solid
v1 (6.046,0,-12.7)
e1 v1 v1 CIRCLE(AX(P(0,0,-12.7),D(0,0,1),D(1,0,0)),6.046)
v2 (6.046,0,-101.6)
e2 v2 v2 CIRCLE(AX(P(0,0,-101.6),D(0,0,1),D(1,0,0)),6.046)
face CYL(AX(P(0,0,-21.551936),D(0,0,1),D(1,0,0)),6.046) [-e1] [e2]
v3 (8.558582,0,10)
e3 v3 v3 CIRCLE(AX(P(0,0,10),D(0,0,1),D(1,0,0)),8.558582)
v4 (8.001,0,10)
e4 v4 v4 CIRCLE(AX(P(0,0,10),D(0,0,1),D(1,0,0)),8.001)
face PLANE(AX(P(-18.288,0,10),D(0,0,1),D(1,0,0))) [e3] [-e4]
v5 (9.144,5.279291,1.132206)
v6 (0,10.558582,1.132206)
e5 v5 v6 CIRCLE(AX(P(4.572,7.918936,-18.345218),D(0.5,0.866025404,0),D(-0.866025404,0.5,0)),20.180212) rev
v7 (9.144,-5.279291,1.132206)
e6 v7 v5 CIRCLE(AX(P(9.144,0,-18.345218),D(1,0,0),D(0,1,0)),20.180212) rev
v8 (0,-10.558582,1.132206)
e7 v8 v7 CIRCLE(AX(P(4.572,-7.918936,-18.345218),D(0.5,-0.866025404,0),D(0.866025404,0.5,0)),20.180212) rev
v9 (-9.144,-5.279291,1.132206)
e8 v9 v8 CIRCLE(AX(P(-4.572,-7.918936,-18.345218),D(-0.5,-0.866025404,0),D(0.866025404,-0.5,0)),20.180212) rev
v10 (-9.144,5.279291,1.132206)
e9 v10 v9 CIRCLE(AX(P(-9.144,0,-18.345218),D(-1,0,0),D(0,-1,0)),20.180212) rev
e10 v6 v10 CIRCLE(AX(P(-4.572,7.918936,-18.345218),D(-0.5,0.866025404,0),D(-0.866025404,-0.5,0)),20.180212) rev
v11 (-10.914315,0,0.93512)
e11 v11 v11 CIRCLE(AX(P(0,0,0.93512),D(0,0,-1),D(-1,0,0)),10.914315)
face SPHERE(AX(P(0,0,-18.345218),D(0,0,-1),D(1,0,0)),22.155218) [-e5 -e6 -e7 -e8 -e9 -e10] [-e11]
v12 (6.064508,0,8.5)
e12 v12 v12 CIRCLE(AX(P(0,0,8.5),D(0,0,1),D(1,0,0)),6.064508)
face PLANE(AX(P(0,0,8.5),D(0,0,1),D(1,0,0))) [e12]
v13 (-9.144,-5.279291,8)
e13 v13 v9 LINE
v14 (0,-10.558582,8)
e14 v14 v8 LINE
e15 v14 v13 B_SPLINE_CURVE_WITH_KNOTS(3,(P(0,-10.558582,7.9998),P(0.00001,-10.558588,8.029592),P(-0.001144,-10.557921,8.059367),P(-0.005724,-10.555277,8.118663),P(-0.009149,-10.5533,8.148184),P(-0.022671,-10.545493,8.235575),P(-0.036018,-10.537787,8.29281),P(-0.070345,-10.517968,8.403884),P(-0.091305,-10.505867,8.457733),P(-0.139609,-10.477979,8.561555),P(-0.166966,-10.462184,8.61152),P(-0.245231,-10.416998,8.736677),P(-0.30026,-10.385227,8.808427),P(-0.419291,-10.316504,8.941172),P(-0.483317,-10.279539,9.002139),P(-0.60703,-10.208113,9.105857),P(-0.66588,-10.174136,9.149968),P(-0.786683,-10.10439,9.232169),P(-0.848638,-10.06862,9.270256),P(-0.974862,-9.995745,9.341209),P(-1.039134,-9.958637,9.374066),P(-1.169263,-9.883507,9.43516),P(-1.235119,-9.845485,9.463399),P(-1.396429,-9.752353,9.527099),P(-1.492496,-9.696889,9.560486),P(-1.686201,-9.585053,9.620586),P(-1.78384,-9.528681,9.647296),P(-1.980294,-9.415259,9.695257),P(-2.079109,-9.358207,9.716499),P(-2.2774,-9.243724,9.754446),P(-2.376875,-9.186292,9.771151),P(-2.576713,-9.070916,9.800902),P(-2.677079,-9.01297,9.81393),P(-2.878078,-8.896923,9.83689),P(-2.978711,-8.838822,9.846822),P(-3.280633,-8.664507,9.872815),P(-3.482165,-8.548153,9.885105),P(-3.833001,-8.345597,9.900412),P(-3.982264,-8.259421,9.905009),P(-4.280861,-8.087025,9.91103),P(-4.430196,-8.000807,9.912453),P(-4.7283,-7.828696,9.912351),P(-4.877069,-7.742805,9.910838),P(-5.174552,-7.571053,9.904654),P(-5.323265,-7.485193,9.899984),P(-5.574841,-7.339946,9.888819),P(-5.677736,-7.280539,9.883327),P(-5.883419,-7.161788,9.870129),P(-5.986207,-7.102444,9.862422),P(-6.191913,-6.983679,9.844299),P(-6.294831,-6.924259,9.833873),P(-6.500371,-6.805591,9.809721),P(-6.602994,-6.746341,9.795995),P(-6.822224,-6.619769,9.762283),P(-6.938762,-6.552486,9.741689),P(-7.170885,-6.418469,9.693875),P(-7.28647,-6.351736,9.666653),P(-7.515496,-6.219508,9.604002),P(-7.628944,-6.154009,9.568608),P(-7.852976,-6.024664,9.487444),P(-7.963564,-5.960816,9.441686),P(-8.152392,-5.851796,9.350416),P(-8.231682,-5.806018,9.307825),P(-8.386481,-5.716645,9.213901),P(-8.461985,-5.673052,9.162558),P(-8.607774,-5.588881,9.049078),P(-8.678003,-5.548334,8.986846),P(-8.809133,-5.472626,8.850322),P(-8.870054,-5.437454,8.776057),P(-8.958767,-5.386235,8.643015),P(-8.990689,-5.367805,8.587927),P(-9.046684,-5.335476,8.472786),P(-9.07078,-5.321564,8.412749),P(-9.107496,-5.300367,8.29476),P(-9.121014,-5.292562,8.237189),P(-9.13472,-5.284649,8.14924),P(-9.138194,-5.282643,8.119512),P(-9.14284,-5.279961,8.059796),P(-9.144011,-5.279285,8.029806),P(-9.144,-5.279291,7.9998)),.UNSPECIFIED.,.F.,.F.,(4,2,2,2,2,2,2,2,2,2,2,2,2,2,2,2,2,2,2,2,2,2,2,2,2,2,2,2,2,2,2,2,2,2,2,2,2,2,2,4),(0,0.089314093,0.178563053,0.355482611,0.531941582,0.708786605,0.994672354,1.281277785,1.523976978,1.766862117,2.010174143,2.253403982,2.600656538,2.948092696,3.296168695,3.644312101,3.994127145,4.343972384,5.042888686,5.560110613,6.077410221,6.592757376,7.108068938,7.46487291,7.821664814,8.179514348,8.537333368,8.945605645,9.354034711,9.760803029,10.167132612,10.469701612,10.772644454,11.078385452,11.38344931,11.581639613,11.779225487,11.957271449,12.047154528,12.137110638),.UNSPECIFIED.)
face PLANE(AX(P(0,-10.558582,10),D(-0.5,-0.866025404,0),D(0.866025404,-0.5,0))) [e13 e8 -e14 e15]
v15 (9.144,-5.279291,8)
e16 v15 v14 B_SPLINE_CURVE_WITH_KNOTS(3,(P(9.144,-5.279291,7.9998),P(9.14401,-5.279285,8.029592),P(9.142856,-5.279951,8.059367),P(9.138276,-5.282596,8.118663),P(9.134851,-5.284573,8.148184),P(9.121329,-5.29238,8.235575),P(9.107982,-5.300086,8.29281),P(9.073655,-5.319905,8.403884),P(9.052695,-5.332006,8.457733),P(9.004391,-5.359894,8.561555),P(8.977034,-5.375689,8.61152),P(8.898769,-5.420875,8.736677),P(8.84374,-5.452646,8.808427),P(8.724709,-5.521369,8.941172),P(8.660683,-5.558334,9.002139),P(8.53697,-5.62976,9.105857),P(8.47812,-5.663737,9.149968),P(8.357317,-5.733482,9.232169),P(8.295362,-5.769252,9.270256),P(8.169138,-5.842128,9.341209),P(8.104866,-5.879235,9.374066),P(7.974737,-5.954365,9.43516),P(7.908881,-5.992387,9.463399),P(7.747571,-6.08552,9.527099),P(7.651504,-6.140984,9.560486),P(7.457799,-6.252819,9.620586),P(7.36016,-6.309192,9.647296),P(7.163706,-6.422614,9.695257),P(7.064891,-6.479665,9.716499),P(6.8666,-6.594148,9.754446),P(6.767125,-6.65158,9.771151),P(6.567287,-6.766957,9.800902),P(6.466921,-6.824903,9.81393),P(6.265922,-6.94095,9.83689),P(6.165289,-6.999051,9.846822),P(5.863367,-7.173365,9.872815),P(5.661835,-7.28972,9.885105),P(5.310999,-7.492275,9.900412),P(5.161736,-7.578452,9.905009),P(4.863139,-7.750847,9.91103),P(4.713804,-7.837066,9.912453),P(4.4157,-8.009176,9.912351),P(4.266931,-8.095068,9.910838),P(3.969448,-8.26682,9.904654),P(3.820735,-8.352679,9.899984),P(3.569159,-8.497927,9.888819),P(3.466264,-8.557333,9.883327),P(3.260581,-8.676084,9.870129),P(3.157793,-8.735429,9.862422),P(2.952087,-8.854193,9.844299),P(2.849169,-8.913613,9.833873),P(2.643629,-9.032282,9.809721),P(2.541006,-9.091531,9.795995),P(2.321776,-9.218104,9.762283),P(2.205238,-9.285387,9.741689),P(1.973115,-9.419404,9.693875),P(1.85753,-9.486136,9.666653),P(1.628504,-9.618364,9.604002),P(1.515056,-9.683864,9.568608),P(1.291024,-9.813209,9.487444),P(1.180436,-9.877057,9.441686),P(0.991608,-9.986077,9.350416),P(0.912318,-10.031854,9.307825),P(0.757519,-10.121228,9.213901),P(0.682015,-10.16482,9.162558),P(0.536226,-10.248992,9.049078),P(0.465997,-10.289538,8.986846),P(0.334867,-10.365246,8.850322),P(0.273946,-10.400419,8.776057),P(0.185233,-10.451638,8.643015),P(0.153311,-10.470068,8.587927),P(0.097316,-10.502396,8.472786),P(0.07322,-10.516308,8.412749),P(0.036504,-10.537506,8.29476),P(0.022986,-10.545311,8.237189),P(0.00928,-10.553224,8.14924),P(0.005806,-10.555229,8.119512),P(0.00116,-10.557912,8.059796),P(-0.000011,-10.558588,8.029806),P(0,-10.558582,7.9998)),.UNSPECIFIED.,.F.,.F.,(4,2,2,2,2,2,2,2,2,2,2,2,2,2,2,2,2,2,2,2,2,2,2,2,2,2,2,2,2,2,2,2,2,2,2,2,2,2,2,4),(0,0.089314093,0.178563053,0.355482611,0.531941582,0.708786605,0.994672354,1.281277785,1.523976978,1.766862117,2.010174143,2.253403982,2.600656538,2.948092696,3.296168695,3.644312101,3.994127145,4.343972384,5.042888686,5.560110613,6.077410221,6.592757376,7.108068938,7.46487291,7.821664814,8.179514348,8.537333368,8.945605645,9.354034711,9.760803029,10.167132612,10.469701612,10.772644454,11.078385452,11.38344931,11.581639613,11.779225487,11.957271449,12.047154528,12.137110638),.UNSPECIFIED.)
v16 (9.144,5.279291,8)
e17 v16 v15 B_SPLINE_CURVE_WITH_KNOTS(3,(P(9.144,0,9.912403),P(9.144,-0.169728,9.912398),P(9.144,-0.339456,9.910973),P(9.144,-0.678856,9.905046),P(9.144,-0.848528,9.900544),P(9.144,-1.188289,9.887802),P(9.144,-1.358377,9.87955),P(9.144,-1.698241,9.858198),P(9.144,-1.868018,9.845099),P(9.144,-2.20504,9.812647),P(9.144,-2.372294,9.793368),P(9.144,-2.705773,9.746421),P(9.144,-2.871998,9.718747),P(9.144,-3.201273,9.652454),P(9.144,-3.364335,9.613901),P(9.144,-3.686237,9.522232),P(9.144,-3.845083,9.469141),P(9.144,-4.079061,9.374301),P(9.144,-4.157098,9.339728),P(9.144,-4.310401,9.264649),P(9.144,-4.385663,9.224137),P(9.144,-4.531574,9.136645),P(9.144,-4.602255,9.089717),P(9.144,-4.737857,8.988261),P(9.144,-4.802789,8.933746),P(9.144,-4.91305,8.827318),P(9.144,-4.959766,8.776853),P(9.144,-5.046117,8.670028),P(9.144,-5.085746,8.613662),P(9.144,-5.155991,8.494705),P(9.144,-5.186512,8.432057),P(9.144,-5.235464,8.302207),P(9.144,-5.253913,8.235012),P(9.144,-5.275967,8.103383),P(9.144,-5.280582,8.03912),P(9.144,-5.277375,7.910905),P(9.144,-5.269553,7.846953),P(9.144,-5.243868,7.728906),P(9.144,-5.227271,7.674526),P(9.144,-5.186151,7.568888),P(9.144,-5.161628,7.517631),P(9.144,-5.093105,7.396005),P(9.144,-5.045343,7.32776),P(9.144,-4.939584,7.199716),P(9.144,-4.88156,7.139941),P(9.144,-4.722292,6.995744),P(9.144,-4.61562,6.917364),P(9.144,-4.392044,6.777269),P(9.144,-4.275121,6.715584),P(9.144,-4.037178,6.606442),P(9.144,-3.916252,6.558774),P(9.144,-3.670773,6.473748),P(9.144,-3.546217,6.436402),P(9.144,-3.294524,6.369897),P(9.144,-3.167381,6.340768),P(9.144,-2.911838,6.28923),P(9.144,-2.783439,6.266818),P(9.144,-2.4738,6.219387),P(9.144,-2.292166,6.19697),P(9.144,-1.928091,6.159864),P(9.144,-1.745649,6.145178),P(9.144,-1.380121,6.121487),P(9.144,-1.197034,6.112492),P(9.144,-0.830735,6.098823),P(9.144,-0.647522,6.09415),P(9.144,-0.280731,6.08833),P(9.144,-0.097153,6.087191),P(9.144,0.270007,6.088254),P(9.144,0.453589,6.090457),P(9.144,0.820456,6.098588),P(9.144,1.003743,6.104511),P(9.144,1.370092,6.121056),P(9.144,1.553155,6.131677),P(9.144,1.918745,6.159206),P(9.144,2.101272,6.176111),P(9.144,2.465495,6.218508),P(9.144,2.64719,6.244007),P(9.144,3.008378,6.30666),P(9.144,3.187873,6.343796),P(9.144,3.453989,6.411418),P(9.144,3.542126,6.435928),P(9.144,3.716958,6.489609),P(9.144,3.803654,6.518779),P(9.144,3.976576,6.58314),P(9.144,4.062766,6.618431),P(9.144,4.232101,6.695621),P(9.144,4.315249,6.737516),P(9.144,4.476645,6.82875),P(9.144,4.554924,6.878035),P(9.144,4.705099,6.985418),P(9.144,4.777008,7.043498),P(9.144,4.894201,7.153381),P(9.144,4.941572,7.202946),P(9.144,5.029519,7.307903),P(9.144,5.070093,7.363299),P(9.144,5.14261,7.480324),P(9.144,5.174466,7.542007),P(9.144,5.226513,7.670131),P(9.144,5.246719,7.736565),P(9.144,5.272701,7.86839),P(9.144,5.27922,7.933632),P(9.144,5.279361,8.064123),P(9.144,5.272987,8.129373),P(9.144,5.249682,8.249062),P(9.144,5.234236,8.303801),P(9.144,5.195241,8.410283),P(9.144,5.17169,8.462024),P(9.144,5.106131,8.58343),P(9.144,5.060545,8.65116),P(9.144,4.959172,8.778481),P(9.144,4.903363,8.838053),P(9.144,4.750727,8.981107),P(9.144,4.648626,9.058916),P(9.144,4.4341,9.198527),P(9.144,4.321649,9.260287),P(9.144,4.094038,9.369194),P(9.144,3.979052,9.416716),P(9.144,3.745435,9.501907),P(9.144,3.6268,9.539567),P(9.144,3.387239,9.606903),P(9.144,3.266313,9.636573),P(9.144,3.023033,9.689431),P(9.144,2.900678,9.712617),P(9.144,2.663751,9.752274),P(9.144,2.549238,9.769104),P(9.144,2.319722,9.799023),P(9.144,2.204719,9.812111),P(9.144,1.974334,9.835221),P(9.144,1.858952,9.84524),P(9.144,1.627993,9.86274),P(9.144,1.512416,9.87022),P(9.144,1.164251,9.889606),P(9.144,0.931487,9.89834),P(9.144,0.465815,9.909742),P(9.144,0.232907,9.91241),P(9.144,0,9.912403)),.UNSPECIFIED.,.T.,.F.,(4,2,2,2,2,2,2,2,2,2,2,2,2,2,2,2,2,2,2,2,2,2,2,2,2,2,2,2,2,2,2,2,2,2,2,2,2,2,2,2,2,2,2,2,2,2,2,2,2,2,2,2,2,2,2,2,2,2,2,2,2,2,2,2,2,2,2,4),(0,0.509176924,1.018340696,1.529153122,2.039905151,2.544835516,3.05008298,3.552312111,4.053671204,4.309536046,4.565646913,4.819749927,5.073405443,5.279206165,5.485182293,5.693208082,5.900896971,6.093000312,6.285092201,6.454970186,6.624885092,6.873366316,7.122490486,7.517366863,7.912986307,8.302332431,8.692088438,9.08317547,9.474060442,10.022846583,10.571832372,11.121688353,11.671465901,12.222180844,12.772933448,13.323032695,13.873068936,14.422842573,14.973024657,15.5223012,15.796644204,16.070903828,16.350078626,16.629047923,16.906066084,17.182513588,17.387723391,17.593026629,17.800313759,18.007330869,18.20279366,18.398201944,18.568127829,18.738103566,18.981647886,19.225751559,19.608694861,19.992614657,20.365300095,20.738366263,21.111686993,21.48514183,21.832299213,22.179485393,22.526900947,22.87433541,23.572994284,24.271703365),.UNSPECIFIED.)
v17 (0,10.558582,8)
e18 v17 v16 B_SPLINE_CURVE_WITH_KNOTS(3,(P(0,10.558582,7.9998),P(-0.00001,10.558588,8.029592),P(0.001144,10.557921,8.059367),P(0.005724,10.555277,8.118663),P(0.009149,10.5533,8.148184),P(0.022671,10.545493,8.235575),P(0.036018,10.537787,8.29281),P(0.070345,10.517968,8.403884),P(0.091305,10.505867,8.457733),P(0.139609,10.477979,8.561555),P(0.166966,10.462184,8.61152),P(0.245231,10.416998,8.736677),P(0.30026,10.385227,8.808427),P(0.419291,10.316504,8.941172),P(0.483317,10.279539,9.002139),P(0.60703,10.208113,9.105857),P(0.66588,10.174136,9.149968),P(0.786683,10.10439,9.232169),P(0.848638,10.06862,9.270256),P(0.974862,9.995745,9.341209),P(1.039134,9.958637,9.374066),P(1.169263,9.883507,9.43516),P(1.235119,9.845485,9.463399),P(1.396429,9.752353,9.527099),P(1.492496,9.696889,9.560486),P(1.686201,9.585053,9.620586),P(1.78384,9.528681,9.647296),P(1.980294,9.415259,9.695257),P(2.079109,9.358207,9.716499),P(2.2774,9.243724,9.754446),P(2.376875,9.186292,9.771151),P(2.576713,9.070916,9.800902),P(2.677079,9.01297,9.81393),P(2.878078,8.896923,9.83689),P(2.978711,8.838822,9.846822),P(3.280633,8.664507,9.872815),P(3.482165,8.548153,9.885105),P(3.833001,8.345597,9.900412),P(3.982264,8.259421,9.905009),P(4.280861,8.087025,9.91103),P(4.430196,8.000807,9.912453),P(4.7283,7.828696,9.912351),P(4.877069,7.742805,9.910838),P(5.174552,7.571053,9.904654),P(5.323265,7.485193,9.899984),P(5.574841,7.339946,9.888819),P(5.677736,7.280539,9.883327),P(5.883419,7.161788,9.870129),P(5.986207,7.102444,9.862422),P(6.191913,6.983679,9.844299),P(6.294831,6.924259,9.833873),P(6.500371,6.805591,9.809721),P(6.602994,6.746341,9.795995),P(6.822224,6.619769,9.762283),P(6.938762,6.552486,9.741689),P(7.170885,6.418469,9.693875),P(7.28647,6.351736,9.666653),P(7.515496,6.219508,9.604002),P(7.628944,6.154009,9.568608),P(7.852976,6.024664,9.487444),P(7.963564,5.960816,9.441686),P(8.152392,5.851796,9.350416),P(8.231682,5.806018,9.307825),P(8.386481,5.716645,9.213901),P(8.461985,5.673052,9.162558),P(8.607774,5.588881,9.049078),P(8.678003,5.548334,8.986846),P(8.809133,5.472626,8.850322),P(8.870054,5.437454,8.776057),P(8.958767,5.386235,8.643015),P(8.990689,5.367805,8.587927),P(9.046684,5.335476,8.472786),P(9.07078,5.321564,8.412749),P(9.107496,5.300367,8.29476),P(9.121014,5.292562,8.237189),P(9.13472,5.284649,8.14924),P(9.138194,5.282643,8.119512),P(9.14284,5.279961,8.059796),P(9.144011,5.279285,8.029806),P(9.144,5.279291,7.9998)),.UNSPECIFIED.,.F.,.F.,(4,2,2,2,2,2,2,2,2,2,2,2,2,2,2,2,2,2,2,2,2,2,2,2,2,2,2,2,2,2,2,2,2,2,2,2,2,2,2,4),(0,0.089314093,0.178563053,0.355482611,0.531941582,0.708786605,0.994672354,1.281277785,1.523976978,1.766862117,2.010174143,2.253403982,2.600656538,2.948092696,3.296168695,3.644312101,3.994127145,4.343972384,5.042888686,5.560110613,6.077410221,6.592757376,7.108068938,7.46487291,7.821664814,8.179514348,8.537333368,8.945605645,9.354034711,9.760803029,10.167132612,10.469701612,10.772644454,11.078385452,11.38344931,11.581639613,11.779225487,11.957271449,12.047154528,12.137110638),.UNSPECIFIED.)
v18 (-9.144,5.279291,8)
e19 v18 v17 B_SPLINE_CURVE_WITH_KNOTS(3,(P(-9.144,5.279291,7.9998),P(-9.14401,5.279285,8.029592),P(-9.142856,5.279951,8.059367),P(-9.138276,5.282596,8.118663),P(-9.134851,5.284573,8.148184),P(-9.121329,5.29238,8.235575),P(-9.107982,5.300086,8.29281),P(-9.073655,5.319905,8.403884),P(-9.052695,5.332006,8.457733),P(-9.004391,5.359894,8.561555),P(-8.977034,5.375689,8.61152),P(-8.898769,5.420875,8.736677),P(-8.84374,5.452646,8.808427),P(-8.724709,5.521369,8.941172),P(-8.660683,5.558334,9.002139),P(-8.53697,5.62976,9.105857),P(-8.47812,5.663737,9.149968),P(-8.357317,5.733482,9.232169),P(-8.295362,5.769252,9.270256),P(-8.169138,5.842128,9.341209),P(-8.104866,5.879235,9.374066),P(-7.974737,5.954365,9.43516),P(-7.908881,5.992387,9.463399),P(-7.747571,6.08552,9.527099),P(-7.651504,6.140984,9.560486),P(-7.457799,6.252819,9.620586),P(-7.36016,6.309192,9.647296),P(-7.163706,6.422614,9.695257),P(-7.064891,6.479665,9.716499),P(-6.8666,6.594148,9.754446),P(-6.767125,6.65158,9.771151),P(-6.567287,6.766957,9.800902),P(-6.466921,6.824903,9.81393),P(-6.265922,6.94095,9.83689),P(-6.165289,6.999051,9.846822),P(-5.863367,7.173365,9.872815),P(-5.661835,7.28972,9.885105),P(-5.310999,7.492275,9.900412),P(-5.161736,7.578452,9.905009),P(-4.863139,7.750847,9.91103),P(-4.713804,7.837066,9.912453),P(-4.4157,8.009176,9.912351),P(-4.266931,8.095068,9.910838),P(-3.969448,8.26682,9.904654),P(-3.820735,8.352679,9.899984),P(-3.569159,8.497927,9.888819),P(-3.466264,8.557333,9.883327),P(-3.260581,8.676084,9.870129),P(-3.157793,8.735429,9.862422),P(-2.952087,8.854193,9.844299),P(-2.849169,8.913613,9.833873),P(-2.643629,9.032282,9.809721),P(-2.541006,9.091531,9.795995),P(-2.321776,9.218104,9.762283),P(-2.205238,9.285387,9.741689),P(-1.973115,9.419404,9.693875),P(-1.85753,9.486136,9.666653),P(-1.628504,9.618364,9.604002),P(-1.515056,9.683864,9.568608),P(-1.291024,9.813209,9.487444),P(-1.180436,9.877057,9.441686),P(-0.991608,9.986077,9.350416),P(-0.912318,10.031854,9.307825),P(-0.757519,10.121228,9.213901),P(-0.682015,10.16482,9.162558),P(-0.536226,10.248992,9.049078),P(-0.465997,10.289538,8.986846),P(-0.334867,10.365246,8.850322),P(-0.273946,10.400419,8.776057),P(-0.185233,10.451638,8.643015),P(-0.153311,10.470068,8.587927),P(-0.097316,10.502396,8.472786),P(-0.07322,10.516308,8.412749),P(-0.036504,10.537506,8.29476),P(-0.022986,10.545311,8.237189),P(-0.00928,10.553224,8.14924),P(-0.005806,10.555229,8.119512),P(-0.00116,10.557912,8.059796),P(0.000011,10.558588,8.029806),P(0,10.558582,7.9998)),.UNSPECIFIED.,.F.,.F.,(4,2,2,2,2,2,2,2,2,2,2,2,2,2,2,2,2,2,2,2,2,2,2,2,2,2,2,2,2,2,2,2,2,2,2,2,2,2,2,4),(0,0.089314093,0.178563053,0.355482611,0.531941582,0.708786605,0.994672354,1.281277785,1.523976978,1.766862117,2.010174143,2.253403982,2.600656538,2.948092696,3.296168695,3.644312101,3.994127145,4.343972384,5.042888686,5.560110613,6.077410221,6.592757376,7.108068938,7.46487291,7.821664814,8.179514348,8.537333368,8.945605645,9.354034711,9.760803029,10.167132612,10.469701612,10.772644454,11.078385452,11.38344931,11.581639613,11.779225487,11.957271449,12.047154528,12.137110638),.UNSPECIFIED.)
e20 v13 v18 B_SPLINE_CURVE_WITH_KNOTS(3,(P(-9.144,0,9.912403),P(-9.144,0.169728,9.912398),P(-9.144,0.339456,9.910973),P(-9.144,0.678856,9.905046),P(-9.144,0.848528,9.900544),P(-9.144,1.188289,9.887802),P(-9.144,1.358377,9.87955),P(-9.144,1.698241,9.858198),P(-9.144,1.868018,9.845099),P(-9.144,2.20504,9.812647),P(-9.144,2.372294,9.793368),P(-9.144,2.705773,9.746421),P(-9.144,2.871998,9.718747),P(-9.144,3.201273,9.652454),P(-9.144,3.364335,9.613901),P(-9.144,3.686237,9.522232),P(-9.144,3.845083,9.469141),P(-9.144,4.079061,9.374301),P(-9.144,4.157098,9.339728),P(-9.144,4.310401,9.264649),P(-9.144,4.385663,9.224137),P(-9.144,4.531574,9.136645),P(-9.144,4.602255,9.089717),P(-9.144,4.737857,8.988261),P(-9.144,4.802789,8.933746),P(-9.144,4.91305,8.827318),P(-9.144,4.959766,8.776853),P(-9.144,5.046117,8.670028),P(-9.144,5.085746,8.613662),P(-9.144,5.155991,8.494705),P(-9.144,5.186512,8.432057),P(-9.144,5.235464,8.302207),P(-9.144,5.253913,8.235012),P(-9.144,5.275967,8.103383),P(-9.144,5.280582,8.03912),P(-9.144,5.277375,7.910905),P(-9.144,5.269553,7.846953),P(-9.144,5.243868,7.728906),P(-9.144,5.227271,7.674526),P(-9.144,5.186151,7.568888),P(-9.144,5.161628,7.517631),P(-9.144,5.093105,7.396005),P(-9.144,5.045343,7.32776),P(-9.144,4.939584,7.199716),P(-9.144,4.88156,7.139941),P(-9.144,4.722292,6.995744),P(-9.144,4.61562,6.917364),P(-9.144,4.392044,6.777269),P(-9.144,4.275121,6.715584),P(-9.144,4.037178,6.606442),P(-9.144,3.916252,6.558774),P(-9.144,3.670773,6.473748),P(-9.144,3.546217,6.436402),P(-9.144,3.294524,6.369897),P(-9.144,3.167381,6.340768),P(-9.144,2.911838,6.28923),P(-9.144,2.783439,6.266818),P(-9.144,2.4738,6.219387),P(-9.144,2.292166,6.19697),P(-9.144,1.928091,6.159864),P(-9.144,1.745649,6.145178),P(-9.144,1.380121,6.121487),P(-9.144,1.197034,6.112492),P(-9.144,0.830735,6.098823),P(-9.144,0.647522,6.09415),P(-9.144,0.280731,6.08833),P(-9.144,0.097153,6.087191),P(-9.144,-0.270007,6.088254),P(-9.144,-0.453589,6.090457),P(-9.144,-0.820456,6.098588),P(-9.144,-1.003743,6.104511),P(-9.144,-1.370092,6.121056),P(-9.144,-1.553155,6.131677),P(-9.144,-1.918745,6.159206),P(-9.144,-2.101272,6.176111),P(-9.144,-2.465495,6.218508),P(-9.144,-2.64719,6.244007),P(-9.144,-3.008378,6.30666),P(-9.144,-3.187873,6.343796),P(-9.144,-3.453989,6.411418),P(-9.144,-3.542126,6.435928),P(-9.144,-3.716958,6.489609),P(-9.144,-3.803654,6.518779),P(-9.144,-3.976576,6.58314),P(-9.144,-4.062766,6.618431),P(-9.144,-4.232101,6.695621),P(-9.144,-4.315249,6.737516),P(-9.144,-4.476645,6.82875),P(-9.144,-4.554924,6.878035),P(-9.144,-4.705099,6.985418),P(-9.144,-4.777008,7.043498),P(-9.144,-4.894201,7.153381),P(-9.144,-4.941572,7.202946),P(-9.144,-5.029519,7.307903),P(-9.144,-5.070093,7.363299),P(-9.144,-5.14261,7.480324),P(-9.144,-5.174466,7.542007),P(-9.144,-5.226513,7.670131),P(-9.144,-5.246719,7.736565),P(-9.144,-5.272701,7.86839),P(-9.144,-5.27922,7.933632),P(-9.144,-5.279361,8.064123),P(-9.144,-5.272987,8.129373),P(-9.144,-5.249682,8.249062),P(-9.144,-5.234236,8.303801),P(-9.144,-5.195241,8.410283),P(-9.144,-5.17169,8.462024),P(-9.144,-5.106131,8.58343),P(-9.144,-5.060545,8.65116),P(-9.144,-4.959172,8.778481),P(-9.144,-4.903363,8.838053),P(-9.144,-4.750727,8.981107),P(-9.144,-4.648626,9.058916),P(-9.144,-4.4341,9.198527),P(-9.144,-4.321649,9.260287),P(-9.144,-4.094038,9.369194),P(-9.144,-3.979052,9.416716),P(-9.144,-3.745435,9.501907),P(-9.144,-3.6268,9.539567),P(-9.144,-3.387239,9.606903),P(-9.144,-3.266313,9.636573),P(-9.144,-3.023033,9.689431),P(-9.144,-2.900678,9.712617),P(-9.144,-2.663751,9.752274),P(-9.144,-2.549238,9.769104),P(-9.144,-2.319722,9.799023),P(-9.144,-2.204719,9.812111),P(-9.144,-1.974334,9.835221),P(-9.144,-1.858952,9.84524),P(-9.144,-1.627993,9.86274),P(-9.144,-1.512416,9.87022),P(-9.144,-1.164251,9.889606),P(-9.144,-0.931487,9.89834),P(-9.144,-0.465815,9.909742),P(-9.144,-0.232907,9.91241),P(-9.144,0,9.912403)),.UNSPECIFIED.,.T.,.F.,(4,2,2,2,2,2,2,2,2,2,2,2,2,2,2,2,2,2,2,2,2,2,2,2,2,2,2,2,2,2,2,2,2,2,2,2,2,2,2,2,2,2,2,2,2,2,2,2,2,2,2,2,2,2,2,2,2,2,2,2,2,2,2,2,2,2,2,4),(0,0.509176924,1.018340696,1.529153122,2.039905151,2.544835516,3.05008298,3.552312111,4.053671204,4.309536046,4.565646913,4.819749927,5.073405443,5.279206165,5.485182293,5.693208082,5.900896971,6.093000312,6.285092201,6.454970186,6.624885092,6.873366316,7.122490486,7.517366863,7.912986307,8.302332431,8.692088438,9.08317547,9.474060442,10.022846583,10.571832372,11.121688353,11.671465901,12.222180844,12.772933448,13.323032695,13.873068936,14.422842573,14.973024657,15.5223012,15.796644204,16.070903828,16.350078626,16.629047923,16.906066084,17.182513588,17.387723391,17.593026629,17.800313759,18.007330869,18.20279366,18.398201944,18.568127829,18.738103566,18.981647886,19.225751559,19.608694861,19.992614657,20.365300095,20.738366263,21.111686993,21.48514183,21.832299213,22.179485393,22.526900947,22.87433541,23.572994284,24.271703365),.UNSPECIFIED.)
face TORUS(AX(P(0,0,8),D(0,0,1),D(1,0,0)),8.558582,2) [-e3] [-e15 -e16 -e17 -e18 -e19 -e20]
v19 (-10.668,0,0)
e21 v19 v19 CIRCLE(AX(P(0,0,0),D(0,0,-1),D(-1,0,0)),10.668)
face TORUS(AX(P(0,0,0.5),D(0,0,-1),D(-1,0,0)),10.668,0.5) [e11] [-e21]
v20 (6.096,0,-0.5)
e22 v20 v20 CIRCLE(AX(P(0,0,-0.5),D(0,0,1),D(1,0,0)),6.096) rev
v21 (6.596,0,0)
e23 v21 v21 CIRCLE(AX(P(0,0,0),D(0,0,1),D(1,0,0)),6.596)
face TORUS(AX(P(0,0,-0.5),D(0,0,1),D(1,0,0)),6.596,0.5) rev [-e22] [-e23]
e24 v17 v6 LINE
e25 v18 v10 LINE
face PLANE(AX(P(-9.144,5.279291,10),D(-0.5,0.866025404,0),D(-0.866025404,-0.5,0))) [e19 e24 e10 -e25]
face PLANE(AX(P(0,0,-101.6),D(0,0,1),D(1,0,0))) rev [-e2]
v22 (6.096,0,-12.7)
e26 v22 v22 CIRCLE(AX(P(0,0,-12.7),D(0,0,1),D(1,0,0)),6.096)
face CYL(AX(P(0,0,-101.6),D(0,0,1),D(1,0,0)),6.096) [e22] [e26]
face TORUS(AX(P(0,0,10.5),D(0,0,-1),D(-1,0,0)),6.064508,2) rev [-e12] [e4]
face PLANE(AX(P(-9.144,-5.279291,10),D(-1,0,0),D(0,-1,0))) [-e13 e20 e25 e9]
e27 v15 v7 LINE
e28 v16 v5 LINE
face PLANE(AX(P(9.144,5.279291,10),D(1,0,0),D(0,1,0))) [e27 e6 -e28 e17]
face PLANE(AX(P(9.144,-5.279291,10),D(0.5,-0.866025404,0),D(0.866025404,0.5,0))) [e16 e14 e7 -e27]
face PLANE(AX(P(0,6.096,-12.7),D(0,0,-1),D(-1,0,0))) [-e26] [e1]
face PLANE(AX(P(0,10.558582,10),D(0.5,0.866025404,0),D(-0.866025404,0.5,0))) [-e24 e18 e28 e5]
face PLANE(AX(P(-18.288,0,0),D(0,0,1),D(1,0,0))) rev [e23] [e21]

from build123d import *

# Parameters (mm, degrees)
HEAD_DEPTH     = 10
SHANK_SKETCH_R = 6.096
SHANK_DEPTH    = 101.6
SKETCH6_R      = 8.001
HEAD_CUT_DEPTH = 1.5
FILLET1_R      = 2
FILLET2_R      = 0.5
THREAD_END_W   = 88.9
THREAD_END_H   = 0.05


with BuildPart() as part:
    # Head Sketch → Head (new body)
    with BuildSketch(Plane.XY):
        Polygon((0, 10.558581723), (9.144, 5.279290861), (9.144, -5.279290861), (0, -10.558581723), (-9.144, -5.279290861), (-9.144, 5.279290861), align=None)
    extrude(amount=HEAD_DEPTH)

    # Shank Sketch → Shank (add)
    with BuildSketch(Plane.XY):
        Circle(SHANK_SKETCH_R)
    extrude(amount=-SHANK_DEPTH)

    # Sketch3 → Flange (revolve)
    with BuildSketch(Plane(origin=(0, 0, 0), x_dir=(-1, 0, 0), z_dir=(0, 1, 0)), mode=Mode.PRIVATE) as flange_sk:
        with BuildLine():
            Line((-10.668, 0), (0, 0))
            Line((0, 0), (0, 3.81))
            ThreePointArc((0, 3.81), (-5.643297007, 3.079227926), (-10.91431477, 0.935119563))
            ThreePointArc((-10.91431477, 0.935119563), (-11.151507901, 0.372641807), (-10.668, 0))
        make_face()
    revolve(flange_sk.sketch.rotate(Axis((0, 0, 0), (0, 0, 1)), 30), axis=Axis((0, 0, 0), (0, 0, 1)))

    # Sketch5 → Head Trim (revolve, cut)
    with BuildSketch(Plane(origin=(0, 0, 0), x_dir=(0, 0, -1), z_dir=(1, 0, 0)), mode=Mode.PRIVATE) as head_trim_sk:
        with BuildLine():
            Line((-10, -8.558581723), (-10, -10.558581723))
            Line((-10, -10.558581723), (-8, -10.558581723))
            ThreePointArc((-8, -10.558581723), (-9.414213562, -9.972795285), (-10, -8.558581723))
        make_face()
    revolve(head_trim_sk.sketch.rotate(Axis((0, 0, 15.085599173), (0, 0, -1)), 90), axis=Axis((0, 0, 15.085599173), (0, 0, -1)), mode=Mode.SUBTRACT)

    # Sketch6 → Head Cut (cut)
    with BuildSketch(Plane.XY.offset(10)):
        Circle(SKETCH6_R)
    extrude(amount=-HEAD_CUT_DEPTH, mode=Mode.SUBTRACT)

    # Fillet1
    # the kernel refuses this fillet: 2 mm, written as the material it adds along each edge
    with BuildSketch(Plane(origin=(0, 0, 8.5), x_dir=(1, 0, 0), z_dir=(0, -1, 0))) as fillet1_piece_1:
        with BuildLine():
            CenterArc((6.064508327, 2), FILLET1_R, 270, 75.522487814)
            Line((6.064508327, 0), (6.064508327, -0.04))
            Line((6.064508327, -0.04), (8.001, -0.04))
            Line((8.001, -0.04), (8.041, 0))
            ThreePointArc((8.041, 0), (8.041, 0.75), (8.039729833, 1.49))
            Line((8.039729833, 1.49), (8.001, 1.5))
        make_face()
    revolve(axis=Axis((0, 0, 8.5), (0, 0, 1)))

    # Fillet2
    fillet2_edges = [part.edges().sort_by_distance(p)[0] for p in [
        (-6.096, 0, 0),
    ]]
    fillet(fillet2_edges, radius=FILLET2_R)

    # Thread End → Thread Cut (revolve, cut)
    with BuildSketch(Plane(origin=(0, 0, 0), x_dir=(0, 0, -1), z_dir=(1, 0, 0)), mode=Mode.PRIVATE) as thread_cut_sk:
        with Locations((57.15, 6.071)):
            Rectangle(THREAD_END_W, THREAD_END_H)
    revolve(thread_cut_sk.sketch.rotate(Axis((0, 0, -21.551935625), (0, 0, -1)), 90), axis=Axis((0, 0, -21.551935625), (0, 0, -1)), mode=Mode.SUBTRACT)


solid = part.part
